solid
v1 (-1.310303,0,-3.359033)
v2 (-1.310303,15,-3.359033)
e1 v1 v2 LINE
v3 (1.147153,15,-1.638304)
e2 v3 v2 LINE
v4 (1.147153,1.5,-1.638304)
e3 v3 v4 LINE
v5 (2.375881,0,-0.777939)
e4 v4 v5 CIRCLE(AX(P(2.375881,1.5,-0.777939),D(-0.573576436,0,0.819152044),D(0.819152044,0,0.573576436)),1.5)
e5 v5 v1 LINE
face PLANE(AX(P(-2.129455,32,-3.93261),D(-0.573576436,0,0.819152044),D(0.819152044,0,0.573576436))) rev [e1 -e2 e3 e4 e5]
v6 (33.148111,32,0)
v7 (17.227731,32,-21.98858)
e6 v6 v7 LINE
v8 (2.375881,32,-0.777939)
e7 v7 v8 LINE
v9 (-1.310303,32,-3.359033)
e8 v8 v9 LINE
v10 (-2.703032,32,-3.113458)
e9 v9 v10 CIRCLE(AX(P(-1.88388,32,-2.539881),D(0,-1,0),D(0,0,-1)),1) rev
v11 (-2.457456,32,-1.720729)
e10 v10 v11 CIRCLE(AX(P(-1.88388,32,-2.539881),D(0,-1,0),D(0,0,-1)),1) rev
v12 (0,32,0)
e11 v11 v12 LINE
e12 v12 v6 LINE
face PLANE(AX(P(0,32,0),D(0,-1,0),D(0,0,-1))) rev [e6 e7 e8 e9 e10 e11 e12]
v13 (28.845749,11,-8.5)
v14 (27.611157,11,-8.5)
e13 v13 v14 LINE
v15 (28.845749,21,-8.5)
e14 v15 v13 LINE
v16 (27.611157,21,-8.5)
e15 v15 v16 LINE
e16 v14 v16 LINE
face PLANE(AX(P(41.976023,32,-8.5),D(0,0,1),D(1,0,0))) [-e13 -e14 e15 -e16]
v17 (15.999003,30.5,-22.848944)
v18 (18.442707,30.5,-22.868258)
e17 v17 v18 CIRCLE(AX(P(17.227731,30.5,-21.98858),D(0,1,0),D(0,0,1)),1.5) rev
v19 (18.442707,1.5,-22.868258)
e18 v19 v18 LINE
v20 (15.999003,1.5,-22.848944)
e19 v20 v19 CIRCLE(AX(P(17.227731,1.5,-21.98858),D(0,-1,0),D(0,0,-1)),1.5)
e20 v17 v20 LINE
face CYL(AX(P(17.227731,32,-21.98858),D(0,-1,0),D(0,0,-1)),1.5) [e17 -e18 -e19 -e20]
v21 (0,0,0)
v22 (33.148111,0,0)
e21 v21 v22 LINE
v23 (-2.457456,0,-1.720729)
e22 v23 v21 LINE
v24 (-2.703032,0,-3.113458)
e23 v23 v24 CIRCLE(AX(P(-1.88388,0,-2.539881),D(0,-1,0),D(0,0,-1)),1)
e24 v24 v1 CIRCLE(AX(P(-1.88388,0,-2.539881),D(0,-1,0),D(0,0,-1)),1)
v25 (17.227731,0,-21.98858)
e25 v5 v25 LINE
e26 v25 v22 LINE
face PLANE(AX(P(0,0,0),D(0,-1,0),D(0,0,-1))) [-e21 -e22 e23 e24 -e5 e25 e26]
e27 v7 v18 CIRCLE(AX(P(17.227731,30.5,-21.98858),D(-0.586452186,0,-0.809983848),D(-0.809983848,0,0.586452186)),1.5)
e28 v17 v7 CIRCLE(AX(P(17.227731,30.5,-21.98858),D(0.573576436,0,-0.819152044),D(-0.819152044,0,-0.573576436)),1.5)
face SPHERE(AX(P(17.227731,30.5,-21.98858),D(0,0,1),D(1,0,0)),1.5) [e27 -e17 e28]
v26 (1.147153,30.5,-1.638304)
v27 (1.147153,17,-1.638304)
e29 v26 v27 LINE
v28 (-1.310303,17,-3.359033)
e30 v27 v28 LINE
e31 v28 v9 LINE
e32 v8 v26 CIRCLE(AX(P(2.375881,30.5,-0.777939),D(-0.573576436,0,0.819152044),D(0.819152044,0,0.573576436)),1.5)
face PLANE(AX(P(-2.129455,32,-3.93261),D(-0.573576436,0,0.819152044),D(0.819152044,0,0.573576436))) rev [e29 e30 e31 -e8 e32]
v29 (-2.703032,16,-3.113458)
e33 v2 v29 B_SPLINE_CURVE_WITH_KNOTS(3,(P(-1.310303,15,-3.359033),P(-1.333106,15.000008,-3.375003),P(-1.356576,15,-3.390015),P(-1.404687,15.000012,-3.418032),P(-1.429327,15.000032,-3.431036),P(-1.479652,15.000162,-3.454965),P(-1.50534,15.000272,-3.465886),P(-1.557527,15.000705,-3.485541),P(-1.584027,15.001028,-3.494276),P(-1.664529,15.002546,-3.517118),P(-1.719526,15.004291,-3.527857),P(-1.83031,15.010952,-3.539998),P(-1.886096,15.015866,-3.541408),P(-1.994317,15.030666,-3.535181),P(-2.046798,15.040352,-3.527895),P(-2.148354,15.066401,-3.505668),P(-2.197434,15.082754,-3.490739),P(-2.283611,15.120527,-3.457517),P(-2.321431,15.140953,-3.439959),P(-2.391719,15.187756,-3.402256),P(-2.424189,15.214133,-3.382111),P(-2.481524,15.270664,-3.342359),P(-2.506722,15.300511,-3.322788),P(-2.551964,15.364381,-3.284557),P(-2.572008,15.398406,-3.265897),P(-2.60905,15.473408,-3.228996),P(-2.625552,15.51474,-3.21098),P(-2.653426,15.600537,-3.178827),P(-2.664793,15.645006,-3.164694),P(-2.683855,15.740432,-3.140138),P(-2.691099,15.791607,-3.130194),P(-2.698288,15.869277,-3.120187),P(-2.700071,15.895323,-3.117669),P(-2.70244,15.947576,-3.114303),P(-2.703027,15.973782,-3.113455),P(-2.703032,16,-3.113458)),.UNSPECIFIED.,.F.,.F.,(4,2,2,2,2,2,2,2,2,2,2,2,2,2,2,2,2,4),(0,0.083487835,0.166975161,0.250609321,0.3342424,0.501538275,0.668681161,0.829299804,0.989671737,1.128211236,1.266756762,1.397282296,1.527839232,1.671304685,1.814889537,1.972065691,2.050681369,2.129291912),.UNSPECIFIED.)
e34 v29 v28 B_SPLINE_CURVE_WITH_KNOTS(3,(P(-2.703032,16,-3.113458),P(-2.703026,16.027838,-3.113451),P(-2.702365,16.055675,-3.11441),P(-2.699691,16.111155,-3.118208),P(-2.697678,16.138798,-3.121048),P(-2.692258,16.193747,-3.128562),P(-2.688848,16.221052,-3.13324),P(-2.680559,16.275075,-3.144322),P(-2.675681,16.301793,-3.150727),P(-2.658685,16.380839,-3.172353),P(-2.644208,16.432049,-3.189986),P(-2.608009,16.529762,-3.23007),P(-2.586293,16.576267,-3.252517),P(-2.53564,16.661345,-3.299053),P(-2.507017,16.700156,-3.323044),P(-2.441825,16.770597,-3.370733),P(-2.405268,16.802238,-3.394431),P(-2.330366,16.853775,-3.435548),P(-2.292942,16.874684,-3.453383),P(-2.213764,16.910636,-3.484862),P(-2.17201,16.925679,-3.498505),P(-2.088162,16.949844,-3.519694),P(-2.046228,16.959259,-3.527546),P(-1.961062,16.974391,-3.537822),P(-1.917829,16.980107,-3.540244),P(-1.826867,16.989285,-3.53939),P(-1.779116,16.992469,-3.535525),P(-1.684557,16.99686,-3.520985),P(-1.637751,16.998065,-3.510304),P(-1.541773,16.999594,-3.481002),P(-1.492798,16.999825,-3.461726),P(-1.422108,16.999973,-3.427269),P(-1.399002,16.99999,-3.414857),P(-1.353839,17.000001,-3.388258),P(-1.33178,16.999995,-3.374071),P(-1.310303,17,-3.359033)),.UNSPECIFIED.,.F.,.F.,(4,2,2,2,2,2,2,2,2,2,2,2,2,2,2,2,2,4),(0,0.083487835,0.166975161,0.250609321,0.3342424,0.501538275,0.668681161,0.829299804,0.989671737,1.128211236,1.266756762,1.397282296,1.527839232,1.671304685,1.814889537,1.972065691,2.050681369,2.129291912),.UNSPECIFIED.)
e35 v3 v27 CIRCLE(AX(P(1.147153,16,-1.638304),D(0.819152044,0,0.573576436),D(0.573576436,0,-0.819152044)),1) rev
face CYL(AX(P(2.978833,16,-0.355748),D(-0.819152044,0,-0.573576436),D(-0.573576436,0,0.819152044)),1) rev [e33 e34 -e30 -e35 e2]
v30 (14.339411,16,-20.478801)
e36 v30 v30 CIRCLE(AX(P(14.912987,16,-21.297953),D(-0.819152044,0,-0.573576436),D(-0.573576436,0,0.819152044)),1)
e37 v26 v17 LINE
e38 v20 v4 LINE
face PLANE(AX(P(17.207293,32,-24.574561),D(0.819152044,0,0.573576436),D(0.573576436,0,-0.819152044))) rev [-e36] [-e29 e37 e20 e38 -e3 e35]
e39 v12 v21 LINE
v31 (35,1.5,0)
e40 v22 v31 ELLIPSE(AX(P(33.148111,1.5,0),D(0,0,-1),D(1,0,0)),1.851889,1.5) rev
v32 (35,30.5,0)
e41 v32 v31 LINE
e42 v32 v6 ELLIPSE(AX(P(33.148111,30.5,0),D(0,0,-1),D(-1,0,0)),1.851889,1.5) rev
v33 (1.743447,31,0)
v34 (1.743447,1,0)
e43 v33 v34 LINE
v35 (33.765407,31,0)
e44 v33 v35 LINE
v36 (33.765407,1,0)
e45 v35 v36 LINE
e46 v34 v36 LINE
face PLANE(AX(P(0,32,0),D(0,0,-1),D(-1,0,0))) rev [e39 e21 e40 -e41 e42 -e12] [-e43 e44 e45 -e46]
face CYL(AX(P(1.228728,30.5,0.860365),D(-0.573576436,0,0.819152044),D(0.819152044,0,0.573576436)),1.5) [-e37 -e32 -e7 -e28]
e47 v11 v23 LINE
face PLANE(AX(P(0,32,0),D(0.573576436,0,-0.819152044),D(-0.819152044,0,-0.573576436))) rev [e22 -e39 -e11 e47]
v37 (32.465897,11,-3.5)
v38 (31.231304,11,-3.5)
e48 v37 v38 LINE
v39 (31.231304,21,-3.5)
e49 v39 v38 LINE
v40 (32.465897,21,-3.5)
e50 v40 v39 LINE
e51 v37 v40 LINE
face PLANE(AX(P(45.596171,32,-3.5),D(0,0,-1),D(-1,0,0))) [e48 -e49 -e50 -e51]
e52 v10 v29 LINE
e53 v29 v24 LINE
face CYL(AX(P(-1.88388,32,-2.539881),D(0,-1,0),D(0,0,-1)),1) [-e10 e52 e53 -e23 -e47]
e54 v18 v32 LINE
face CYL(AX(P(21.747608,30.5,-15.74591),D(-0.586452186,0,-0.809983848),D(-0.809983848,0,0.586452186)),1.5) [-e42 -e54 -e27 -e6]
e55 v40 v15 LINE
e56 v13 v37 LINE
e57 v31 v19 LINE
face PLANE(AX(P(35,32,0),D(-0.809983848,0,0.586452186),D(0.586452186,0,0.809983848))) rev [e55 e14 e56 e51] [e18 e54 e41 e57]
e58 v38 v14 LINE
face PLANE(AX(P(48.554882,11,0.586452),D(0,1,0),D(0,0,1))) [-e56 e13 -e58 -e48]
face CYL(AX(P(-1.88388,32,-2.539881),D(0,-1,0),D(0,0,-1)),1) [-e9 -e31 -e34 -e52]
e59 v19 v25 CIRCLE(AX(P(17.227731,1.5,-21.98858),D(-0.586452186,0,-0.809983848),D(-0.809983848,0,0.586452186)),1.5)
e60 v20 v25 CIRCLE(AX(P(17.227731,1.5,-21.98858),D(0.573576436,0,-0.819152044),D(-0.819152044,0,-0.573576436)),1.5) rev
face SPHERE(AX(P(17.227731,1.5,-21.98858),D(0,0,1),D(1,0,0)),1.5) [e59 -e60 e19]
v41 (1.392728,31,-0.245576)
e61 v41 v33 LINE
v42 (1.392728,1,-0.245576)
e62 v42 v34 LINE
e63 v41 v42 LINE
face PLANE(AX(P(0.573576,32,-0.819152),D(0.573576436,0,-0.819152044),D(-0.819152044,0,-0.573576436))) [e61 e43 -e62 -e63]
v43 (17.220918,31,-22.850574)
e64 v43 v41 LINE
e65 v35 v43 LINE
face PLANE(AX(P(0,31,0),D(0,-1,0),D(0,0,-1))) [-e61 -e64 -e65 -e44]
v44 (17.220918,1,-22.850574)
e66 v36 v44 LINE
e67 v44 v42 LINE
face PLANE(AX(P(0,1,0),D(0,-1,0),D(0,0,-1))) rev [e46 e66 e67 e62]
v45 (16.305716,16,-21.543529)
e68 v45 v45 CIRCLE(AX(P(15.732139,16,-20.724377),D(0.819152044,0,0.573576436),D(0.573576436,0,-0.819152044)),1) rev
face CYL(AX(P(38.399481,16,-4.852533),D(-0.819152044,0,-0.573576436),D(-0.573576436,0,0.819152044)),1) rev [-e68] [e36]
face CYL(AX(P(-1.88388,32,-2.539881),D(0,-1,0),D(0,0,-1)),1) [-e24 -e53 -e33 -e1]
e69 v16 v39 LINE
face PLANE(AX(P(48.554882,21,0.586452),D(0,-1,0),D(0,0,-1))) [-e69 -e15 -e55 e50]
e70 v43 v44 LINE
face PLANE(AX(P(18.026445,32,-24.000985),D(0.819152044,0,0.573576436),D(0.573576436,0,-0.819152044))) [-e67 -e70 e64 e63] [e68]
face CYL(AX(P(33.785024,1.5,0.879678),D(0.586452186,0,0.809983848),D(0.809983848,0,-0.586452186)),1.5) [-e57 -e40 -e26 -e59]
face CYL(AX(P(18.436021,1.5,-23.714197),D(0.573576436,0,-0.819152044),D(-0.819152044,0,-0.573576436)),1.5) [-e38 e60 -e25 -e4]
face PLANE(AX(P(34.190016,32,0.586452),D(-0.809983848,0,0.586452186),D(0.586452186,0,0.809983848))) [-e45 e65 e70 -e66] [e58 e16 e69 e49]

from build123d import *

# Parameters (mm, degrees)
EXTRUDE_1_DEPTH     = 32
EXTRUDE_2_DEPTH     = 32
CUT_EXTRUDE_1_DEPTH = 4
SHELL_START         = 1
SHELL_1_DEPTH       = 30
CUT_EXTRUDE_START   = 27.611157
SKETCH_4_W          = 5
SKETCH_4_H          = 10
CUT_EXTRUDE_2_DEPTH = 4.85474
CUT_EXTRUDE_3_REACH = 55.413
SKETCH_6_R          = 1
FILLET_1_R          = 1
FILLET_2_R          = 1
FILLET_3_R          = 1.5


# Read off the part's stored shape, not the designer's step: 抽壳1
with BuildPart() as part:
    # 草图1 → 凸台-拉伸1 (new body)
    with BuildSketch(Plane(origin=(0, 0, 0), x_dir=(1, 0, 0), z_dir=(0, 1, 0))):
        Polygon((0, 0), (35, 0), (17.207293091, 24.574561329), align=None)
    extrude(amount=EXTRUDE_1_DEPTH)

    # 草图2 → 凸台-拉伸2 (add)
    with BuildSketch(Plane(origin=(0, 0, 0), x_dir=(1, 0, 0), z_dir=(0, 1, 0))):
        Polygon((0, 0), (-3.276608177, 2.294305745), (-2.129455304, 3.932609834), (1.147152873, 1.638304089), align=None)
    extrude(amount=EXTRUDE_2_DEPTH)

    # 草图3 → 切除-拉伸1 (cut)
    with BuildSketch(Plane(origin=(-3.276608177, 0, -2.294305745), x_dir=(-0.5735764363510533, 0, 0.8191520442889868), z_dir=(-0.8191520442889868, 0, -0.5735764363510533))):
        with BuildLine():
            Line((-2, 17), (-2, 15))
            ThreePointArc((-2, 15), (-1, 16), (-2, 17))
        make_face()
    extrude(amount=-CUT_EXTRUDE_1_DEPTH, mode=Mode.SUBTRACT)

    # 抽壳1 outline → 抽壳1 (cut)
    with BuildSketch(Plane(origin=(0, 0, 0), x_dir=(1, 0, 0), z_dir=(0, 1, 0)).offset(SHELL_START)):
        Polygon((1.392728481, 0.245575608), (1.743446796, 0), (33.76540748, 0), (17.220918494, 22.850573626), align=None)
    extrude(amount=SHELL_1_DEPTH, mode=Mode.SUBTRACT)

    # 草图4 → 切除-拉伸2 (cut)
    with BuildSketch(Plane(origin=(0, 0, 0), x_dir=(0, 0, -1), z_dir=(1, 0, 0)).offset(CUT_EXTRUDE_START)):
        with Locations((6, 16)):
            Rectangle(SKETCH_4_W, SKETCH_4_H)
    extrude(amount=CUT_EXTRUDE_2_DEPTH, mode=Mode.SUBTRACT)

    # 草图6 → 切除-拉伸3 (cut, up to next)
    with BuildSketch(Plane(origin=(0, 0, 0), x_dir=(-0.5735764363510502, 0, 0.819152044288989), z_dir=(-0.819152044288989, 0, -0.5735764363510502)), mode=Mode.PRIVATE) as cut_extrude_3_sk1:
        with Locations((-26, 16)):
            Circle(SKETCH_6_R)
    cut_extrude_3_tool1 = extrude(cut_extrude_3_sk1.sketch, amount=-CUT_EXTRUDE_3_REACH, mode=Mode.PRIVATE) & part.part
    add(cut_extrude_3_tool1.solids().sort_by_distance((14.912987, 16, -21.297953))[0], mode=Mode.SUBTRACT)

    # 圆角1
    fillet_1_edges = [part.edges().sort_by_distance(p)[0] for p in [
        (-2.129455304, 24.5, -3.932609834),
        (-2.129455304, 7.5, -3.932609834),
    ]]
    fillet(fillet_1_edges, radius=FILLET_1_R - 0.0001)  # a hair under: the kernel refuses the full size

    # 圆角2
    fillet_2_edges = [part.edges().sort_by_distance(p)[0] for p in [
        (-3.276608177, 16, -2.294305745),
    ]]
    fillet(fillet_2_edges, radius=FILLET_2_R - 0.0001)  # a hair under: the kernel refuses the full size

    # 圆角3
    fillet_3_edges = [part.edges().sort_by_distance(p)[0] for p in [
        (26.103646545, 32, -12.287280664),
        (26.103646545, 0, -12.287280664),
        (9.177222982, 32, -13.106432709),
        (9.177222982, 0, -13.106432709),
        (17.207293091, 16, -24.574561329),
    ]]
    fillet(fillet_3_edges, radius=FILLET_3_R)


solid = part.part
